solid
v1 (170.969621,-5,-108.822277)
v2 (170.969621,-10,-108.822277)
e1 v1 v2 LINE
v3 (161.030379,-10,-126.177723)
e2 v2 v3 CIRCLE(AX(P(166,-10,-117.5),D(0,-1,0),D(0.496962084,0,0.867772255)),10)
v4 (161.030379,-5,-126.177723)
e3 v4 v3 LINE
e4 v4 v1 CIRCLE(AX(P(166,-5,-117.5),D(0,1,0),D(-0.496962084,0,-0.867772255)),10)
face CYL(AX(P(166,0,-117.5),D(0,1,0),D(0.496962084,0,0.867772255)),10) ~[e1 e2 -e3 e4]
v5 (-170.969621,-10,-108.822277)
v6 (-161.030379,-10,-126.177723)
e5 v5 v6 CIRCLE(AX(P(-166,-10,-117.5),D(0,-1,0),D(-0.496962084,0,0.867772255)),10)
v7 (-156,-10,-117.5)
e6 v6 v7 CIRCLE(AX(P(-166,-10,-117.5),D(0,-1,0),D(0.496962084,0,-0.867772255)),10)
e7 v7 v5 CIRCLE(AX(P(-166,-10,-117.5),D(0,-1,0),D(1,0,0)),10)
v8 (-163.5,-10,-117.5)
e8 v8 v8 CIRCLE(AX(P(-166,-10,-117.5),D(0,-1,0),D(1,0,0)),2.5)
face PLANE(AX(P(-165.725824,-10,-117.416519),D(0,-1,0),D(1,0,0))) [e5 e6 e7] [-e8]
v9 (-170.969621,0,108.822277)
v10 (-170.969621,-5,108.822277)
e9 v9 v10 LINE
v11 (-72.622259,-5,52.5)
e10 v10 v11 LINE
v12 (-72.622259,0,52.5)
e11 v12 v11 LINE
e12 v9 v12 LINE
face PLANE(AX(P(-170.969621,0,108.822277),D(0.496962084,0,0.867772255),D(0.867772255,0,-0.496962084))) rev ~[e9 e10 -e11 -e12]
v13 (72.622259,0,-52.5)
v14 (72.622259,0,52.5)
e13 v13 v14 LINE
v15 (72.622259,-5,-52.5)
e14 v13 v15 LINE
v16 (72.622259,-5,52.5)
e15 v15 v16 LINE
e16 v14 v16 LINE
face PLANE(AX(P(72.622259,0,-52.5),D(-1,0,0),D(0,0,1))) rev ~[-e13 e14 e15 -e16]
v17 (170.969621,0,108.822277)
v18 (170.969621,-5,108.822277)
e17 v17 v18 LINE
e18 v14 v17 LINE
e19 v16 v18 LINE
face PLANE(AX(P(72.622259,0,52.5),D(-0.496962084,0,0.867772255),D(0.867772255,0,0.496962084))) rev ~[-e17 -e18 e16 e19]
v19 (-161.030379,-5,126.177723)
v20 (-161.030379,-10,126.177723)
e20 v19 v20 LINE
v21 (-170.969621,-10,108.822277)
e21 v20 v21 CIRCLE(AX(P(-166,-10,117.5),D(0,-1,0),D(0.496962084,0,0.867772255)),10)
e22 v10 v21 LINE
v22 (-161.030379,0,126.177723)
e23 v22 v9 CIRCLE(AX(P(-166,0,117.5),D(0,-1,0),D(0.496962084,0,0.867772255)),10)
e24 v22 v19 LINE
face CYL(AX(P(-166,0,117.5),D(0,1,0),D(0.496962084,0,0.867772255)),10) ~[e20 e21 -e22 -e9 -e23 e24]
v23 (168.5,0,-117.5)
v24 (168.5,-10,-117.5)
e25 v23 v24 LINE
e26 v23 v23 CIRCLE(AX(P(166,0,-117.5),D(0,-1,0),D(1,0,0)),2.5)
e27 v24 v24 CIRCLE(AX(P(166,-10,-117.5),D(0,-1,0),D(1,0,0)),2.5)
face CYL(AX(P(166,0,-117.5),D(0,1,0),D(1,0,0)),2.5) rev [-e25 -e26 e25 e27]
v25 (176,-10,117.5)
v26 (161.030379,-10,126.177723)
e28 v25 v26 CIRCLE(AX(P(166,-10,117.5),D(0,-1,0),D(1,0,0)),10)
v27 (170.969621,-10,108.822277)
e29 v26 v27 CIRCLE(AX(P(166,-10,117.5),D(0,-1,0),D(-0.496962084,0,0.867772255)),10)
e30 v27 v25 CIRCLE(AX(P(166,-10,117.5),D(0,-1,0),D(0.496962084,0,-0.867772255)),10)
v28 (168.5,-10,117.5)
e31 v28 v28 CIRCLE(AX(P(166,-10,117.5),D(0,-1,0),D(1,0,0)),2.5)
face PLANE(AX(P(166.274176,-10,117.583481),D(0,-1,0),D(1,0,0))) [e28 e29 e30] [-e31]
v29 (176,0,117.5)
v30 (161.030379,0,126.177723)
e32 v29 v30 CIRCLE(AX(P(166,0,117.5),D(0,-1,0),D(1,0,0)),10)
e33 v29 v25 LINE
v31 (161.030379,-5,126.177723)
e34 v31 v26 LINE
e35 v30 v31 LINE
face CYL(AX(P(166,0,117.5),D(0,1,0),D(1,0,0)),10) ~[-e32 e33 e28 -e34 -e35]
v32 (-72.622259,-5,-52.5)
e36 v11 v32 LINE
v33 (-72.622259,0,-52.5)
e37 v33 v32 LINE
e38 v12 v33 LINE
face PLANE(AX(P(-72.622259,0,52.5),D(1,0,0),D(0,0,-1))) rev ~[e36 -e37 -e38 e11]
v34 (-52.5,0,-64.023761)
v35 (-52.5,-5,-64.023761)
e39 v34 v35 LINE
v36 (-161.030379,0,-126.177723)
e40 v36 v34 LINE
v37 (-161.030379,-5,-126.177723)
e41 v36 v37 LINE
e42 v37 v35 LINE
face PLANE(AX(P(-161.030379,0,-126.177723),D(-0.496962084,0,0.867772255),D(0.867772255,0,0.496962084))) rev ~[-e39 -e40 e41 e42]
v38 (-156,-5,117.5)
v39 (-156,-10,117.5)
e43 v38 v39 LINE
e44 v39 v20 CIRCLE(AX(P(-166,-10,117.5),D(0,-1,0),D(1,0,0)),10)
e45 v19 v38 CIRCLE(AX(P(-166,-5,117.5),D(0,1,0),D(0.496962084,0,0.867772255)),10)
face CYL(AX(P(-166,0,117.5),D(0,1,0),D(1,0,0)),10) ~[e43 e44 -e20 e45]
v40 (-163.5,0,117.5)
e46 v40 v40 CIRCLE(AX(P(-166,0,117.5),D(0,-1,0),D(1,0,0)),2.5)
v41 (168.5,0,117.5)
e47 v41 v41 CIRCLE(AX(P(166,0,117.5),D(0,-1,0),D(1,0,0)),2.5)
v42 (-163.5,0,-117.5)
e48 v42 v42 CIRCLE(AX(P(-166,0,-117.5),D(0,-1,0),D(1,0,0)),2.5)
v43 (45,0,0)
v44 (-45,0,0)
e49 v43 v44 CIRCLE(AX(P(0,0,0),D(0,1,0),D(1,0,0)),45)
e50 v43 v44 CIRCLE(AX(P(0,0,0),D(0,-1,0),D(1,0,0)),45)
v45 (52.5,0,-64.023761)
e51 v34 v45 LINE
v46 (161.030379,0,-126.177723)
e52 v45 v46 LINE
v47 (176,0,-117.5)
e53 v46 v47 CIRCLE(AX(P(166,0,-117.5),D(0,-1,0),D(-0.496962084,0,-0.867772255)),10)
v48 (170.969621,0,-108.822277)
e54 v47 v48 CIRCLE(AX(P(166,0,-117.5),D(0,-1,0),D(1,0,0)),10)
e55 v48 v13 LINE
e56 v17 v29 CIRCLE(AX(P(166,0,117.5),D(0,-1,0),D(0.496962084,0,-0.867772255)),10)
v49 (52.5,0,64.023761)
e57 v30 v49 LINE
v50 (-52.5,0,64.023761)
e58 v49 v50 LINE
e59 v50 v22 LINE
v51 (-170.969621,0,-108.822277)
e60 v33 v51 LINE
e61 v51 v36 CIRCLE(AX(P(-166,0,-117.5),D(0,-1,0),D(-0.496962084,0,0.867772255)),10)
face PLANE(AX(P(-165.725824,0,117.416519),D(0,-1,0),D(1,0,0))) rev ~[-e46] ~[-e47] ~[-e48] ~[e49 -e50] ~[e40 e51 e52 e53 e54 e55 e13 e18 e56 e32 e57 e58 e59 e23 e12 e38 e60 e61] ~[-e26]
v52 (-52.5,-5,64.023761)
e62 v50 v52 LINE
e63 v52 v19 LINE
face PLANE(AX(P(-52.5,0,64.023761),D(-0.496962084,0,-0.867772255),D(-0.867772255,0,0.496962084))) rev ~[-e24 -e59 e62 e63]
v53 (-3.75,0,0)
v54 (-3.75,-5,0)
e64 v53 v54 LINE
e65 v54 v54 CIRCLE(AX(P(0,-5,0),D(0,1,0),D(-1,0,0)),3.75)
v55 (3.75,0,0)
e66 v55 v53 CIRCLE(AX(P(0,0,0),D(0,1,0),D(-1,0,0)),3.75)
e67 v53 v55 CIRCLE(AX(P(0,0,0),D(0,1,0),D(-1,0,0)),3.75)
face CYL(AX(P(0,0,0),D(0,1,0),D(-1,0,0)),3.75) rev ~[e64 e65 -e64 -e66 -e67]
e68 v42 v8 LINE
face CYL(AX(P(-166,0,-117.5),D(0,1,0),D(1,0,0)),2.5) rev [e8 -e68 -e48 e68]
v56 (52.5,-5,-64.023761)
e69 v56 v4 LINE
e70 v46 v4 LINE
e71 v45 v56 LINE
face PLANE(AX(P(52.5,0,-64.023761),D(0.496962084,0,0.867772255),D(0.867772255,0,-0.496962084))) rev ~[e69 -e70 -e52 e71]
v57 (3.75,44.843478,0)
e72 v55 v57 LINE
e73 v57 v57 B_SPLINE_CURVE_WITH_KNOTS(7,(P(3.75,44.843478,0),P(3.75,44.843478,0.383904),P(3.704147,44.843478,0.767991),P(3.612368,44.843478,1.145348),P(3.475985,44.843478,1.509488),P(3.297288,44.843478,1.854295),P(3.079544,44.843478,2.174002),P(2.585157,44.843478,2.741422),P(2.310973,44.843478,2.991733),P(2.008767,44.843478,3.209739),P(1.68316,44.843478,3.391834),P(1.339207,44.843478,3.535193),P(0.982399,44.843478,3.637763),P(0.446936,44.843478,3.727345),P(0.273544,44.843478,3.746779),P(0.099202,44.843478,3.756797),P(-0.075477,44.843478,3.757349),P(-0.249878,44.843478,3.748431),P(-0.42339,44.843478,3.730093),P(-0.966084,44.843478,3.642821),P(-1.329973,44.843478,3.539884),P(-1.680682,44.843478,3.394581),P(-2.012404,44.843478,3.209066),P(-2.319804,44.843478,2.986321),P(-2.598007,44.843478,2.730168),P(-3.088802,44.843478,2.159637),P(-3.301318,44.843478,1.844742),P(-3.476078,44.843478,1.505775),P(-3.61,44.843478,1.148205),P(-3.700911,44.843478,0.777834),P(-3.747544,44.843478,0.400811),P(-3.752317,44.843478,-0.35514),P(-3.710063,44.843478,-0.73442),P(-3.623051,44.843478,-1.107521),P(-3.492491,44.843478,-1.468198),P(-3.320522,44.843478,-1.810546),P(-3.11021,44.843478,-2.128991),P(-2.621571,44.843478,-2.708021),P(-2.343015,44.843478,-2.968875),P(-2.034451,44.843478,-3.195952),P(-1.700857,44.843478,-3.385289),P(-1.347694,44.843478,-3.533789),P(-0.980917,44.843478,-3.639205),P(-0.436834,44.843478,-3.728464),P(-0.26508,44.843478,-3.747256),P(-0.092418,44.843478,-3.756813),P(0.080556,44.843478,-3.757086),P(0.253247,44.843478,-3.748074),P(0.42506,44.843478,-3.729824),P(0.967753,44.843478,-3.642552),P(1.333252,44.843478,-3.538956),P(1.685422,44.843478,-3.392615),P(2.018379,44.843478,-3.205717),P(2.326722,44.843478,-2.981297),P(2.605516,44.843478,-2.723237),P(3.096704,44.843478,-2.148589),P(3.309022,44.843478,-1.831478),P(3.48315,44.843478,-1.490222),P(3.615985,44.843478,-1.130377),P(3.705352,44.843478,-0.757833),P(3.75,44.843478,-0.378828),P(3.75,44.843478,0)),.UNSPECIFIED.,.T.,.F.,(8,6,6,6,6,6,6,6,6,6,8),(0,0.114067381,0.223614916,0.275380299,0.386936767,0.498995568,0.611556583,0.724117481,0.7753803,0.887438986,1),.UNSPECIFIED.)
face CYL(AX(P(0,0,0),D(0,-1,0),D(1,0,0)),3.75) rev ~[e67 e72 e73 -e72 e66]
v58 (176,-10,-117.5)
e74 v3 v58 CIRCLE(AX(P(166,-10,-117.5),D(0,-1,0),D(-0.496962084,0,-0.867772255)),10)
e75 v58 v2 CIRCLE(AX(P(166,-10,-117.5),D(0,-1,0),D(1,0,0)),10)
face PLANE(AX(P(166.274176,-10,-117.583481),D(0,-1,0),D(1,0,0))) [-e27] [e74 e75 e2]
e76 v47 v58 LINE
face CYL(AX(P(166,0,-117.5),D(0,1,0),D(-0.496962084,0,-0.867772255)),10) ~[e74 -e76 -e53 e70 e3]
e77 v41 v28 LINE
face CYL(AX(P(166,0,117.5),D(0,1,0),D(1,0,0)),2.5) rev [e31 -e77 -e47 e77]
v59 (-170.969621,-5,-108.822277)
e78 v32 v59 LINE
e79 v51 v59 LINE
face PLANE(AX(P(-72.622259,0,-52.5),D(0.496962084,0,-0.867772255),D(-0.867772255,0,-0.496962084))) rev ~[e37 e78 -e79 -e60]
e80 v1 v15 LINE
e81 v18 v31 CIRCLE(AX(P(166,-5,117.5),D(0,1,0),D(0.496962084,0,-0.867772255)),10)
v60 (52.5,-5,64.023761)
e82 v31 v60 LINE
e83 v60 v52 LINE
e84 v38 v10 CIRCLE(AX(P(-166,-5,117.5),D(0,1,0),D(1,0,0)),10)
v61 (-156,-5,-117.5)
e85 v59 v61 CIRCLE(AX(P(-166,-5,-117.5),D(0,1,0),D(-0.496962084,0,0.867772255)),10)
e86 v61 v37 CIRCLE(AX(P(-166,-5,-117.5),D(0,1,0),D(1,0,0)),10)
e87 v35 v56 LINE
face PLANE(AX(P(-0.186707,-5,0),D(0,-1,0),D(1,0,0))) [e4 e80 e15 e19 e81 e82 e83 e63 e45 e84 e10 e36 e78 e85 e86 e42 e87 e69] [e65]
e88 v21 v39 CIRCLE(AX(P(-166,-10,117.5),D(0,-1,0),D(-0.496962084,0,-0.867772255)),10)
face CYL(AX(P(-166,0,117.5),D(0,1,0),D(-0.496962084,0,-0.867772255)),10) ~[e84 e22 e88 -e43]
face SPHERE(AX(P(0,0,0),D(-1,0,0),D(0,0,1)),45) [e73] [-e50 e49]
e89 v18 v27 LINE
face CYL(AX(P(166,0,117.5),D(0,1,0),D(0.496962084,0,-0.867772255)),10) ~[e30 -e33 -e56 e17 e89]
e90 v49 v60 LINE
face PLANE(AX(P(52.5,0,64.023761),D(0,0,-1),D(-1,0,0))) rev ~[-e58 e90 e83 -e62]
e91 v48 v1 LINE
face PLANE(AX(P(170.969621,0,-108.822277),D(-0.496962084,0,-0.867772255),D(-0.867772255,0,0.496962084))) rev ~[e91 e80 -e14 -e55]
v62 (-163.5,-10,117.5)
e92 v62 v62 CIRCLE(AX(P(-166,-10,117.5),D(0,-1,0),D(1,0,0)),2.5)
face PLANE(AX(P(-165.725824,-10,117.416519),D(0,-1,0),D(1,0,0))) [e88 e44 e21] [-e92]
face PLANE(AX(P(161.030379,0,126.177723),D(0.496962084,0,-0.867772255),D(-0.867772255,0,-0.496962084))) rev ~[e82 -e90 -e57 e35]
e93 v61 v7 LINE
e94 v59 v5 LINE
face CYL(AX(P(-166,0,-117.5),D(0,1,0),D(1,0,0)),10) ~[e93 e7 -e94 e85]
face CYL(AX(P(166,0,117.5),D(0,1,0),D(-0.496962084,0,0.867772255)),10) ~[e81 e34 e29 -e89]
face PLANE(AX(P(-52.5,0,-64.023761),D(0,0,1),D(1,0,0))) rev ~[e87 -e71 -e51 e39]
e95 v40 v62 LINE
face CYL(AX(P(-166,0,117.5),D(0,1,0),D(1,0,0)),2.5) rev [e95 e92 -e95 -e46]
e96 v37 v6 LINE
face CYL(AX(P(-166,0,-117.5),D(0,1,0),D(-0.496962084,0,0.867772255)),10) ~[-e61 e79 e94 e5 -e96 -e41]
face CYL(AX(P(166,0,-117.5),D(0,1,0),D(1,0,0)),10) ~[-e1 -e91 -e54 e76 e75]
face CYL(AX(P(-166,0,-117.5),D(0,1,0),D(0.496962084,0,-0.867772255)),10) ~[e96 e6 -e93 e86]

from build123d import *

# Parameters (mm, degrees)
F1_DEPTH = 5
F0_R     = 2.5
F2_DEPTH = 10
F3_ANGLE = 180
F4_DEPTH = 45


# Not quite as in the source:
# - a feature names something its author has since deleted; it is built from what else it names


with BuildPart() as f1:
    # F0 (on Front) → F1 (new body)
    with BuildSketch(Plane.XZ):
        with BuildLine():
            Line((52.5, 64.0237609195), (-52.5, 64.0237609195))
            Line((-52.5, 64.0237609195), (-161.030379156, 126.1777225507))
            ThreePointArc((-161.030379156, 126.1777225507), (-157.3485201139, 122.5151665755), (-156, 117.5))
            ThreePointArc((-156, 117.5), (-160.9848334245, 108.8485201139), (-170.969620844, 108.8222774493))
            Line((-170.969620844, 108.8222774493), (-72.6222594518, 52.5))
            Line((-72.6222594518, 52.5), (-72.6222594518, -52.5))
            Line((-72.6222594518, -52.5), (-170.969620844, -108.8222774493))
            ThreePointArc((-170.969620844, -108.8222774493), (-160.9848334245, -108.8485201139), (-156, -117.5))
            ThreePointArc((-156, -117.5), (-157.3485201139, -122.5151665755), (-161.030379156, -126.1777225507))
            Line((-161.030379156, -126.1777225507), (-52.5, -64.0237609195))
            Line((-52.5, -64.0237609195), (52.5, -64.0237609195))
            Line((52.5, -64.0237609195), (161.030379156, -126.1777225507))
            ThreePointArc((161.030379156, -126.1777225507), (157.3222774493, -112.530379156), (170.969620844, -108.8222774493))
            Line((170.969620844, -108.8222774493), (72.6222594518, -52.5))
            Line((72.6222594518, -52.5), (72.6222594518, 52.5))
            Line((72.6222594518, 52.5), (170.969620844, 108.8222774493))
            ThreePointArc((170.969620844, 108.8222774493), (157.3222774493, 112.530379156), (161.030379156, 126.1777225507))
            Line((161.030379156, 126.1777225507), (52.5, 64.0237609195))
        make_face()
        with BuildLine():
            Line((45, 0), (3.75, 0))
            ThreePointArc((3.75, 0), (0, -3.75), (-3.75, 0))
            Line((-3.75, 0), (-45, 0))
            ThreePointArc((-45, 0), (0, 45), (45, 0))
        make_face(mode=Mode.SUBTRACT)
        with BuildLine():
            ThreePointArc((-3.75, 0), (0, 3.75), (3.75, 0))
            Line((3.75, 0), (45, 0))
            ThreePointArc((45, 0), (0, 45), (-45, 0))
            Line((-45, 0), (-3.75, 0))
        make_face()
    extrude(amount=F1_DEPTH)

    # F0 (on Front) → F2 (join)
    with BuildSketch(Plane.XZ):
        with BuildLine():
            ThreePointArc((-156, 117.5), (-157.3485201139, 122.5151665755), (-161.030379156, 126.1777225507))
            ThreePointArc((-161.030379156, 126.1777225507), (-174.6777225507, 122.469620844), (-170.969620844, 108.8222774493))
            ThreePointArc((-170.969620844, 108.8222774493), (-160.9848334245, 108.8485201139), (-156, 117.5))
        make_face()
        with Locations((-166, 117.5)):
            Circle(F0_R, mode=Mode.SUBTRACT)
        with BuildLine():
            ThreePointArc((176, -117.5), (174.6514798861, -112.4848334245), (170.969620844, -108.8222774493))
            ThreePointArc((170.969620844, -108.8222774493), (157.3222774493, -112.530379156), (161.030379156, -126.1777225507))
            ThreePointArc((161.030379156, -126.1777225507), (171.0151665755, -126.1514798861), (176, -117.5))
        make_face()
        with Locations((166, -117.5)):
            Circle(F0_R, mode=Mode.SUBTRACT)
        with BuildLine():
            ThreePointArc((176, 117.5), (171.0151665755, 126.1514798861), (161.030379156, 126.1777225507))
            ThreePointArc((161.030379156, 126.1777225507), (157.3222774493, 112.530379156), (170.969620844, 108.8222774493))
            ThreePointArc((170.969620844, 108.8222774493), (174.6514798861, 112.4848334245), (176, 117.5))
        make_face()
        with Locations((166, 117.5)):
            Circle(F0_R, mode=Mode.SUBTRACT)
        with BuildLine():
            ThreePointArc((-156, -117.5), (-160.9848334245, -108.8485201139), (-170.969620844, -108.8222774493))
            ThreePointArc((-170.969620844, -108.8222774493), (-174.6777225507, -122.469620844), (-161.030379156, -126.1777225507))
            ThreePointArc((-161.030379156, -126.1777225507), (-157.3485201139, -122.5151665755), (-156, -117.5))
        make_face()
        with Locations((-166, -117.5)):
            Circle(F0_R, mode=Mode.SUBTRACT)
    extrude(amount=F2_DEPTH)

    # F0 (on Front) → F3 (revolve)
    with BuildSketch(Plane.XZ):
        with BuildLine():
            ThreePointArc((-3.75, 0), (0, 3.75), (3.75, 0))
            Line((3.75, 0), (45, 0))
            ThreePointArc((45, 0), (0, 45), (-45, 0))
            Line((-45, 0), (-3.75, 0))
        make_face()
    revolve(axis=Axis((0, 0, 0), (-1, 0, 0)), revolution_arc=F3_ANGLE)

    # F0 (on Front) → F4 (cut)
    with BuildSketch(Plane.XZ):
        with BuildLine():
            ThreePointArc((-3.75, 0), (0, -3.75), (3.75, 0))
            Line((3.75, 0), (-3.75, 0))
        make_face()
        with BuildLine():
            Line((-3.75, 0), (3.75, 0))
            ThreePointArc((3.75, 0), (0, 3.75), (-3.75, 0))
        make_face()
    extrude(amount=-F4_DEPTH, mode=Mode.SUBTRACT)


solid = f1.part
